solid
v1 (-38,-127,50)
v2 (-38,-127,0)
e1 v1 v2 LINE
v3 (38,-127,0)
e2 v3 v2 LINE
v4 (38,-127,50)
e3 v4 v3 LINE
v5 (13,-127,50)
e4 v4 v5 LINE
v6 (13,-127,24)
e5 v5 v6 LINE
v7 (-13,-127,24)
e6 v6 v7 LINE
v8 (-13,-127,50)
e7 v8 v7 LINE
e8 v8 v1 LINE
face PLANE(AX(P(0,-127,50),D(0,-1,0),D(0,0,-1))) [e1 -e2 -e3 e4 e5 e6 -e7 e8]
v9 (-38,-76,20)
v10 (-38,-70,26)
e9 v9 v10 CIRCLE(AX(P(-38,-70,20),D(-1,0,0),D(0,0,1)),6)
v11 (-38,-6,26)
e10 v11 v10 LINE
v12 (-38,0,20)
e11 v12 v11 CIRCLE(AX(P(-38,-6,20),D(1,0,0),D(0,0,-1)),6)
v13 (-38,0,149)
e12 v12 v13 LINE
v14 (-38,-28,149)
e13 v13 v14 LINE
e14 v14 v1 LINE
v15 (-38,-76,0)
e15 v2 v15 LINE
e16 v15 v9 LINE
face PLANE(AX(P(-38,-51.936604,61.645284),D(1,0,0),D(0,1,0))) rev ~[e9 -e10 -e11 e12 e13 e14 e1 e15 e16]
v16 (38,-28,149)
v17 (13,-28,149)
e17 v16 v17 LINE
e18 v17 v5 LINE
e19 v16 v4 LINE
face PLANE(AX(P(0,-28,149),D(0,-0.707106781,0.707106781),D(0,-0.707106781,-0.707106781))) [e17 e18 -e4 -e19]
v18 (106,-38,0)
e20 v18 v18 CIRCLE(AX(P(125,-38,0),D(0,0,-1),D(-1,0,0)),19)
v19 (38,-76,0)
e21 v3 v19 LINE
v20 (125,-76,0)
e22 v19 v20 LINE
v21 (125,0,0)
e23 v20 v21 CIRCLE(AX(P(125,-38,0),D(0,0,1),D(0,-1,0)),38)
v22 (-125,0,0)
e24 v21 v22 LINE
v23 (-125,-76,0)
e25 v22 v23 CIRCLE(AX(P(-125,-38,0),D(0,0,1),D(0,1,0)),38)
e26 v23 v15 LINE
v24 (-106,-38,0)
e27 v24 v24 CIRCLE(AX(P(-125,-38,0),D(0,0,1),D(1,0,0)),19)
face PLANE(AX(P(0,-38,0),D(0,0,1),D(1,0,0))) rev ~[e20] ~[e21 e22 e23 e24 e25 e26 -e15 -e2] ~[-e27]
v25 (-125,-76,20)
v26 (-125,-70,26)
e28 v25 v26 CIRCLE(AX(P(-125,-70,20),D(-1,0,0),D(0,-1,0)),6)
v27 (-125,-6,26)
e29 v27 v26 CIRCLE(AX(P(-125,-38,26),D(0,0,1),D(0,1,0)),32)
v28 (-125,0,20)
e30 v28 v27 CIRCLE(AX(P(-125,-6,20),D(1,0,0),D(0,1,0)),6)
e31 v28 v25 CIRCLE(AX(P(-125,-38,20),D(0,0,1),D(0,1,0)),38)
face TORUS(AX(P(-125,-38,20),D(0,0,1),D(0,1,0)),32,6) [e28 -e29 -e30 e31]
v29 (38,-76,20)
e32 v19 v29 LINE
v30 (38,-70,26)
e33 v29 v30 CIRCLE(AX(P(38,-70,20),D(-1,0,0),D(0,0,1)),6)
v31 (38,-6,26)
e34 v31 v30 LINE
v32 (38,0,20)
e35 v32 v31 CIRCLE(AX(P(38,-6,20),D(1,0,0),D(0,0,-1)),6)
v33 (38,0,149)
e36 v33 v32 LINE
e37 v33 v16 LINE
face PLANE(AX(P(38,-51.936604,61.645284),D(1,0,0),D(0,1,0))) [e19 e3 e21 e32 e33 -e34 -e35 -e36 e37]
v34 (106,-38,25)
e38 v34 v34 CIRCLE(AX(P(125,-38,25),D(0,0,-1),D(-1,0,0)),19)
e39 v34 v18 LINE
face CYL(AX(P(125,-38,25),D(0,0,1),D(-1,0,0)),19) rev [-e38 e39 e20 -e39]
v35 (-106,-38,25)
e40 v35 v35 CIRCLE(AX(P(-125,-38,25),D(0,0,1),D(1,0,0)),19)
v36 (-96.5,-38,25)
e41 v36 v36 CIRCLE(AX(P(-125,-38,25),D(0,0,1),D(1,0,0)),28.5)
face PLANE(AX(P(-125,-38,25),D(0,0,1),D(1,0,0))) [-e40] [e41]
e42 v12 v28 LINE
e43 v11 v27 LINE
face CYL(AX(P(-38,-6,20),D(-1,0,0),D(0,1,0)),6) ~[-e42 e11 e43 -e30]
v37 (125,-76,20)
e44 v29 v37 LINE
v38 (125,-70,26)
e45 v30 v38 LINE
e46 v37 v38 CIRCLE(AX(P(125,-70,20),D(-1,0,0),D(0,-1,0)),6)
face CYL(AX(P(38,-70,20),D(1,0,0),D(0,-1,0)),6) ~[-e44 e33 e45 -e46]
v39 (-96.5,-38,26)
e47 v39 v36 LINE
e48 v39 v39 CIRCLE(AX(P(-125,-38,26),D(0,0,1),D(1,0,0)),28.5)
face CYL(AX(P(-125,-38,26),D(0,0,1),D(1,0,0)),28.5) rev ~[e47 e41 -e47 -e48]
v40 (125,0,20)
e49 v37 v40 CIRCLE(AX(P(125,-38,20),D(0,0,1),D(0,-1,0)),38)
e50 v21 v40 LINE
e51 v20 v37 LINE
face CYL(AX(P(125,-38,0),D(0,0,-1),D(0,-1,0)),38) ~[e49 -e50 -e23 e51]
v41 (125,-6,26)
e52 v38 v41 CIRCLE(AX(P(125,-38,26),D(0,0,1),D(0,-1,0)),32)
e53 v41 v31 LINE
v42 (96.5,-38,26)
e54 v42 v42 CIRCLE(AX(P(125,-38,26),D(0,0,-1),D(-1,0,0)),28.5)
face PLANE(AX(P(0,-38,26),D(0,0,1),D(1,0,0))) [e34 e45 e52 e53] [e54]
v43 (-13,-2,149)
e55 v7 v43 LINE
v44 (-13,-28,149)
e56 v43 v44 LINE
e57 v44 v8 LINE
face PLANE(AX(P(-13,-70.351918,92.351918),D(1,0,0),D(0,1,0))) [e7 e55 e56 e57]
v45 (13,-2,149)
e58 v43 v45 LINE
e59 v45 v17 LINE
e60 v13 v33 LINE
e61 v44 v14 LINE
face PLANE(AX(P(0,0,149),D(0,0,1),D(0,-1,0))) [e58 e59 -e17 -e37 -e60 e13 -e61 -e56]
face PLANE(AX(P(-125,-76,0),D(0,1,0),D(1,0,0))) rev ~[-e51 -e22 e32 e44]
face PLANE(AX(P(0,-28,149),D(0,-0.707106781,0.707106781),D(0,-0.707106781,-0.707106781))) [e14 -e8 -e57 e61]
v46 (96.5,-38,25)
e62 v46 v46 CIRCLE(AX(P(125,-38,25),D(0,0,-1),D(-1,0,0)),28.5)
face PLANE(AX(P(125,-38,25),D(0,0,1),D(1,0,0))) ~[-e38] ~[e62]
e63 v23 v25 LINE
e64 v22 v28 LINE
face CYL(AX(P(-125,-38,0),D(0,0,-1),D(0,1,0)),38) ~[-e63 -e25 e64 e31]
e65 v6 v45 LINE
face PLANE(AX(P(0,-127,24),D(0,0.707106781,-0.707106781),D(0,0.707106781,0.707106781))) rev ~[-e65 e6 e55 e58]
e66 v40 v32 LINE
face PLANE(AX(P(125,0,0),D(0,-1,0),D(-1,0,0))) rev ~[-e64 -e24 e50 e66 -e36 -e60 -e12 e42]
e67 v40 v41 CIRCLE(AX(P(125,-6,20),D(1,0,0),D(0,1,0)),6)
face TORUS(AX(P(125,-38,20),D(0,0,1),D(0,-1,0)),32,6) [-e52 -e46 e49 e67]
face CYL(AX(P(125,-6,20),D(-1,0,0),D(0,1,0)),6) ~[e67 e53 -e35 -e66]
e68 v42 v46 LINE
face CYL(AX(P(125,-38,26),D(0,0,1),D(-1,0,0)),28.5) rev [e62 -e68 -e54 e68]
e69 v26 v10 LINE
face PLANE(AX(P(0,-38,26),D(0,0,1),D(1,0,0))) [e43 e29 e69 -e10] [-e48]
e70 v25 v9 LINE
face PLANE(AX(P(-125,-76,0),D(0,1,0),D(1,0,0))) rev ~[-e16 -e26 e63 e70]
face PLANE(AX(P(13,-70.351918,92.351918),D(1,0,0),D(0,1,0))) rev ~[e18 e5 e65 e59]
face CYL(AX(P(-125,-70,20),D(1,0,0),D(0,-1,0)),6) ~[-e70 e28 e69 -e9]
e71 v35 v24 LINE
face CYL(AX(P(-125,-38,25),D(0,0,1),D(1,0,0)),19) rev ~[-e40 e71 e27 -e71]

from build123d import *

# Parameters (mm, degrees)
F1_DEPTH = 38
F3_DEPTH = 13
F5_DEPTH = 26
F6_R     = 28.5
F7_DEPTH = 1
F8_R     = 19
F9_DEPTH = 25
F10_R    = 6


# Not quite as in the source:
# - a pattern or mirror of a feature is missing from the dataset's text; its kind, count and spacing are read off the source's solid


with BuildPart() as f1:
    # F0 (on Right) → F1 (new body, symmetric)
    with BuildSketch(Plane.YZ):
        Polygon((-127, 0), (0, 0), (0, 149), (-28, 149), (-127, 50), align=None)
    extrude(amount=F1_DEPTH, both=True)

    # F2 (on Right) → F3 (cut, symmetric)
    with BuildSketch(Plane.YZ):
        Polygon((-127, 24), (-2, 149), (-28, 149), (-127, 50), align=None)
    extrude(amount=F3_DEPTH, both=True, mode=Mode.SUBTRACT)

    # F4 (on Top) → F5 (join)
    with BuildSketch(Plane.XY):
        with BuildLine():
            ThreePointArc((-125, 0), (-163, -38), (-125, -76))
            Line((-125, -76), (125, -76))
            ThreePointArc((125, -76), (163, -38), (125, 0))
            Line((125, 0), (-125, 0))
        make_face()
    extrude(amount=F5_DEPTH)

    # F6 (on face) → F7 (cut)
    with BuildSketch(Plane.XY.offset(26)):
        with Locations((-125, -38)):
            Circle(F6_R)
    f7 = extrude(amount=-F7_DEPTH, mode=Mode.SUBTRACT)

    # F7_copies: F7 across plane
    add(f7.mirror(Plane(origin=(0, 0, 0), x_dir=(0, 0, 1), z_dir=(1, 0, 0))), mode=Mode.SUBTRACT)

    # F8 (on face) → F9 (cut, through all)
    with BuildSketch(Plane.XY.offset(25)):
        with Locations((-125, -38)):
            Circle(F8_R)
    f9 = extrude(amount=-F9_DEPTH, mode=Mode.SUBTRACT)

    # F9_copies: F9 across plane
    add(f9.mirror(Plane(origin=(0, 0, 0), x_dir=(0, 0, 1), z_dir=(1, 0, 0))), mode=Mode.SUBTRACT)

    # F10
    f10_edges = [f1.edges().sort_by_distance(p)[0] for p in [
        (-81.5, -76, 26),
        (81.5, 0, 26),
        (81.5, -76, 26),
        (163, -38, 26),
        (-163, -38, 26),
        (-81.5, 0, 26),
    ]]
    fillet(f10_edges, radius=F10_R)


solid = f1.part
